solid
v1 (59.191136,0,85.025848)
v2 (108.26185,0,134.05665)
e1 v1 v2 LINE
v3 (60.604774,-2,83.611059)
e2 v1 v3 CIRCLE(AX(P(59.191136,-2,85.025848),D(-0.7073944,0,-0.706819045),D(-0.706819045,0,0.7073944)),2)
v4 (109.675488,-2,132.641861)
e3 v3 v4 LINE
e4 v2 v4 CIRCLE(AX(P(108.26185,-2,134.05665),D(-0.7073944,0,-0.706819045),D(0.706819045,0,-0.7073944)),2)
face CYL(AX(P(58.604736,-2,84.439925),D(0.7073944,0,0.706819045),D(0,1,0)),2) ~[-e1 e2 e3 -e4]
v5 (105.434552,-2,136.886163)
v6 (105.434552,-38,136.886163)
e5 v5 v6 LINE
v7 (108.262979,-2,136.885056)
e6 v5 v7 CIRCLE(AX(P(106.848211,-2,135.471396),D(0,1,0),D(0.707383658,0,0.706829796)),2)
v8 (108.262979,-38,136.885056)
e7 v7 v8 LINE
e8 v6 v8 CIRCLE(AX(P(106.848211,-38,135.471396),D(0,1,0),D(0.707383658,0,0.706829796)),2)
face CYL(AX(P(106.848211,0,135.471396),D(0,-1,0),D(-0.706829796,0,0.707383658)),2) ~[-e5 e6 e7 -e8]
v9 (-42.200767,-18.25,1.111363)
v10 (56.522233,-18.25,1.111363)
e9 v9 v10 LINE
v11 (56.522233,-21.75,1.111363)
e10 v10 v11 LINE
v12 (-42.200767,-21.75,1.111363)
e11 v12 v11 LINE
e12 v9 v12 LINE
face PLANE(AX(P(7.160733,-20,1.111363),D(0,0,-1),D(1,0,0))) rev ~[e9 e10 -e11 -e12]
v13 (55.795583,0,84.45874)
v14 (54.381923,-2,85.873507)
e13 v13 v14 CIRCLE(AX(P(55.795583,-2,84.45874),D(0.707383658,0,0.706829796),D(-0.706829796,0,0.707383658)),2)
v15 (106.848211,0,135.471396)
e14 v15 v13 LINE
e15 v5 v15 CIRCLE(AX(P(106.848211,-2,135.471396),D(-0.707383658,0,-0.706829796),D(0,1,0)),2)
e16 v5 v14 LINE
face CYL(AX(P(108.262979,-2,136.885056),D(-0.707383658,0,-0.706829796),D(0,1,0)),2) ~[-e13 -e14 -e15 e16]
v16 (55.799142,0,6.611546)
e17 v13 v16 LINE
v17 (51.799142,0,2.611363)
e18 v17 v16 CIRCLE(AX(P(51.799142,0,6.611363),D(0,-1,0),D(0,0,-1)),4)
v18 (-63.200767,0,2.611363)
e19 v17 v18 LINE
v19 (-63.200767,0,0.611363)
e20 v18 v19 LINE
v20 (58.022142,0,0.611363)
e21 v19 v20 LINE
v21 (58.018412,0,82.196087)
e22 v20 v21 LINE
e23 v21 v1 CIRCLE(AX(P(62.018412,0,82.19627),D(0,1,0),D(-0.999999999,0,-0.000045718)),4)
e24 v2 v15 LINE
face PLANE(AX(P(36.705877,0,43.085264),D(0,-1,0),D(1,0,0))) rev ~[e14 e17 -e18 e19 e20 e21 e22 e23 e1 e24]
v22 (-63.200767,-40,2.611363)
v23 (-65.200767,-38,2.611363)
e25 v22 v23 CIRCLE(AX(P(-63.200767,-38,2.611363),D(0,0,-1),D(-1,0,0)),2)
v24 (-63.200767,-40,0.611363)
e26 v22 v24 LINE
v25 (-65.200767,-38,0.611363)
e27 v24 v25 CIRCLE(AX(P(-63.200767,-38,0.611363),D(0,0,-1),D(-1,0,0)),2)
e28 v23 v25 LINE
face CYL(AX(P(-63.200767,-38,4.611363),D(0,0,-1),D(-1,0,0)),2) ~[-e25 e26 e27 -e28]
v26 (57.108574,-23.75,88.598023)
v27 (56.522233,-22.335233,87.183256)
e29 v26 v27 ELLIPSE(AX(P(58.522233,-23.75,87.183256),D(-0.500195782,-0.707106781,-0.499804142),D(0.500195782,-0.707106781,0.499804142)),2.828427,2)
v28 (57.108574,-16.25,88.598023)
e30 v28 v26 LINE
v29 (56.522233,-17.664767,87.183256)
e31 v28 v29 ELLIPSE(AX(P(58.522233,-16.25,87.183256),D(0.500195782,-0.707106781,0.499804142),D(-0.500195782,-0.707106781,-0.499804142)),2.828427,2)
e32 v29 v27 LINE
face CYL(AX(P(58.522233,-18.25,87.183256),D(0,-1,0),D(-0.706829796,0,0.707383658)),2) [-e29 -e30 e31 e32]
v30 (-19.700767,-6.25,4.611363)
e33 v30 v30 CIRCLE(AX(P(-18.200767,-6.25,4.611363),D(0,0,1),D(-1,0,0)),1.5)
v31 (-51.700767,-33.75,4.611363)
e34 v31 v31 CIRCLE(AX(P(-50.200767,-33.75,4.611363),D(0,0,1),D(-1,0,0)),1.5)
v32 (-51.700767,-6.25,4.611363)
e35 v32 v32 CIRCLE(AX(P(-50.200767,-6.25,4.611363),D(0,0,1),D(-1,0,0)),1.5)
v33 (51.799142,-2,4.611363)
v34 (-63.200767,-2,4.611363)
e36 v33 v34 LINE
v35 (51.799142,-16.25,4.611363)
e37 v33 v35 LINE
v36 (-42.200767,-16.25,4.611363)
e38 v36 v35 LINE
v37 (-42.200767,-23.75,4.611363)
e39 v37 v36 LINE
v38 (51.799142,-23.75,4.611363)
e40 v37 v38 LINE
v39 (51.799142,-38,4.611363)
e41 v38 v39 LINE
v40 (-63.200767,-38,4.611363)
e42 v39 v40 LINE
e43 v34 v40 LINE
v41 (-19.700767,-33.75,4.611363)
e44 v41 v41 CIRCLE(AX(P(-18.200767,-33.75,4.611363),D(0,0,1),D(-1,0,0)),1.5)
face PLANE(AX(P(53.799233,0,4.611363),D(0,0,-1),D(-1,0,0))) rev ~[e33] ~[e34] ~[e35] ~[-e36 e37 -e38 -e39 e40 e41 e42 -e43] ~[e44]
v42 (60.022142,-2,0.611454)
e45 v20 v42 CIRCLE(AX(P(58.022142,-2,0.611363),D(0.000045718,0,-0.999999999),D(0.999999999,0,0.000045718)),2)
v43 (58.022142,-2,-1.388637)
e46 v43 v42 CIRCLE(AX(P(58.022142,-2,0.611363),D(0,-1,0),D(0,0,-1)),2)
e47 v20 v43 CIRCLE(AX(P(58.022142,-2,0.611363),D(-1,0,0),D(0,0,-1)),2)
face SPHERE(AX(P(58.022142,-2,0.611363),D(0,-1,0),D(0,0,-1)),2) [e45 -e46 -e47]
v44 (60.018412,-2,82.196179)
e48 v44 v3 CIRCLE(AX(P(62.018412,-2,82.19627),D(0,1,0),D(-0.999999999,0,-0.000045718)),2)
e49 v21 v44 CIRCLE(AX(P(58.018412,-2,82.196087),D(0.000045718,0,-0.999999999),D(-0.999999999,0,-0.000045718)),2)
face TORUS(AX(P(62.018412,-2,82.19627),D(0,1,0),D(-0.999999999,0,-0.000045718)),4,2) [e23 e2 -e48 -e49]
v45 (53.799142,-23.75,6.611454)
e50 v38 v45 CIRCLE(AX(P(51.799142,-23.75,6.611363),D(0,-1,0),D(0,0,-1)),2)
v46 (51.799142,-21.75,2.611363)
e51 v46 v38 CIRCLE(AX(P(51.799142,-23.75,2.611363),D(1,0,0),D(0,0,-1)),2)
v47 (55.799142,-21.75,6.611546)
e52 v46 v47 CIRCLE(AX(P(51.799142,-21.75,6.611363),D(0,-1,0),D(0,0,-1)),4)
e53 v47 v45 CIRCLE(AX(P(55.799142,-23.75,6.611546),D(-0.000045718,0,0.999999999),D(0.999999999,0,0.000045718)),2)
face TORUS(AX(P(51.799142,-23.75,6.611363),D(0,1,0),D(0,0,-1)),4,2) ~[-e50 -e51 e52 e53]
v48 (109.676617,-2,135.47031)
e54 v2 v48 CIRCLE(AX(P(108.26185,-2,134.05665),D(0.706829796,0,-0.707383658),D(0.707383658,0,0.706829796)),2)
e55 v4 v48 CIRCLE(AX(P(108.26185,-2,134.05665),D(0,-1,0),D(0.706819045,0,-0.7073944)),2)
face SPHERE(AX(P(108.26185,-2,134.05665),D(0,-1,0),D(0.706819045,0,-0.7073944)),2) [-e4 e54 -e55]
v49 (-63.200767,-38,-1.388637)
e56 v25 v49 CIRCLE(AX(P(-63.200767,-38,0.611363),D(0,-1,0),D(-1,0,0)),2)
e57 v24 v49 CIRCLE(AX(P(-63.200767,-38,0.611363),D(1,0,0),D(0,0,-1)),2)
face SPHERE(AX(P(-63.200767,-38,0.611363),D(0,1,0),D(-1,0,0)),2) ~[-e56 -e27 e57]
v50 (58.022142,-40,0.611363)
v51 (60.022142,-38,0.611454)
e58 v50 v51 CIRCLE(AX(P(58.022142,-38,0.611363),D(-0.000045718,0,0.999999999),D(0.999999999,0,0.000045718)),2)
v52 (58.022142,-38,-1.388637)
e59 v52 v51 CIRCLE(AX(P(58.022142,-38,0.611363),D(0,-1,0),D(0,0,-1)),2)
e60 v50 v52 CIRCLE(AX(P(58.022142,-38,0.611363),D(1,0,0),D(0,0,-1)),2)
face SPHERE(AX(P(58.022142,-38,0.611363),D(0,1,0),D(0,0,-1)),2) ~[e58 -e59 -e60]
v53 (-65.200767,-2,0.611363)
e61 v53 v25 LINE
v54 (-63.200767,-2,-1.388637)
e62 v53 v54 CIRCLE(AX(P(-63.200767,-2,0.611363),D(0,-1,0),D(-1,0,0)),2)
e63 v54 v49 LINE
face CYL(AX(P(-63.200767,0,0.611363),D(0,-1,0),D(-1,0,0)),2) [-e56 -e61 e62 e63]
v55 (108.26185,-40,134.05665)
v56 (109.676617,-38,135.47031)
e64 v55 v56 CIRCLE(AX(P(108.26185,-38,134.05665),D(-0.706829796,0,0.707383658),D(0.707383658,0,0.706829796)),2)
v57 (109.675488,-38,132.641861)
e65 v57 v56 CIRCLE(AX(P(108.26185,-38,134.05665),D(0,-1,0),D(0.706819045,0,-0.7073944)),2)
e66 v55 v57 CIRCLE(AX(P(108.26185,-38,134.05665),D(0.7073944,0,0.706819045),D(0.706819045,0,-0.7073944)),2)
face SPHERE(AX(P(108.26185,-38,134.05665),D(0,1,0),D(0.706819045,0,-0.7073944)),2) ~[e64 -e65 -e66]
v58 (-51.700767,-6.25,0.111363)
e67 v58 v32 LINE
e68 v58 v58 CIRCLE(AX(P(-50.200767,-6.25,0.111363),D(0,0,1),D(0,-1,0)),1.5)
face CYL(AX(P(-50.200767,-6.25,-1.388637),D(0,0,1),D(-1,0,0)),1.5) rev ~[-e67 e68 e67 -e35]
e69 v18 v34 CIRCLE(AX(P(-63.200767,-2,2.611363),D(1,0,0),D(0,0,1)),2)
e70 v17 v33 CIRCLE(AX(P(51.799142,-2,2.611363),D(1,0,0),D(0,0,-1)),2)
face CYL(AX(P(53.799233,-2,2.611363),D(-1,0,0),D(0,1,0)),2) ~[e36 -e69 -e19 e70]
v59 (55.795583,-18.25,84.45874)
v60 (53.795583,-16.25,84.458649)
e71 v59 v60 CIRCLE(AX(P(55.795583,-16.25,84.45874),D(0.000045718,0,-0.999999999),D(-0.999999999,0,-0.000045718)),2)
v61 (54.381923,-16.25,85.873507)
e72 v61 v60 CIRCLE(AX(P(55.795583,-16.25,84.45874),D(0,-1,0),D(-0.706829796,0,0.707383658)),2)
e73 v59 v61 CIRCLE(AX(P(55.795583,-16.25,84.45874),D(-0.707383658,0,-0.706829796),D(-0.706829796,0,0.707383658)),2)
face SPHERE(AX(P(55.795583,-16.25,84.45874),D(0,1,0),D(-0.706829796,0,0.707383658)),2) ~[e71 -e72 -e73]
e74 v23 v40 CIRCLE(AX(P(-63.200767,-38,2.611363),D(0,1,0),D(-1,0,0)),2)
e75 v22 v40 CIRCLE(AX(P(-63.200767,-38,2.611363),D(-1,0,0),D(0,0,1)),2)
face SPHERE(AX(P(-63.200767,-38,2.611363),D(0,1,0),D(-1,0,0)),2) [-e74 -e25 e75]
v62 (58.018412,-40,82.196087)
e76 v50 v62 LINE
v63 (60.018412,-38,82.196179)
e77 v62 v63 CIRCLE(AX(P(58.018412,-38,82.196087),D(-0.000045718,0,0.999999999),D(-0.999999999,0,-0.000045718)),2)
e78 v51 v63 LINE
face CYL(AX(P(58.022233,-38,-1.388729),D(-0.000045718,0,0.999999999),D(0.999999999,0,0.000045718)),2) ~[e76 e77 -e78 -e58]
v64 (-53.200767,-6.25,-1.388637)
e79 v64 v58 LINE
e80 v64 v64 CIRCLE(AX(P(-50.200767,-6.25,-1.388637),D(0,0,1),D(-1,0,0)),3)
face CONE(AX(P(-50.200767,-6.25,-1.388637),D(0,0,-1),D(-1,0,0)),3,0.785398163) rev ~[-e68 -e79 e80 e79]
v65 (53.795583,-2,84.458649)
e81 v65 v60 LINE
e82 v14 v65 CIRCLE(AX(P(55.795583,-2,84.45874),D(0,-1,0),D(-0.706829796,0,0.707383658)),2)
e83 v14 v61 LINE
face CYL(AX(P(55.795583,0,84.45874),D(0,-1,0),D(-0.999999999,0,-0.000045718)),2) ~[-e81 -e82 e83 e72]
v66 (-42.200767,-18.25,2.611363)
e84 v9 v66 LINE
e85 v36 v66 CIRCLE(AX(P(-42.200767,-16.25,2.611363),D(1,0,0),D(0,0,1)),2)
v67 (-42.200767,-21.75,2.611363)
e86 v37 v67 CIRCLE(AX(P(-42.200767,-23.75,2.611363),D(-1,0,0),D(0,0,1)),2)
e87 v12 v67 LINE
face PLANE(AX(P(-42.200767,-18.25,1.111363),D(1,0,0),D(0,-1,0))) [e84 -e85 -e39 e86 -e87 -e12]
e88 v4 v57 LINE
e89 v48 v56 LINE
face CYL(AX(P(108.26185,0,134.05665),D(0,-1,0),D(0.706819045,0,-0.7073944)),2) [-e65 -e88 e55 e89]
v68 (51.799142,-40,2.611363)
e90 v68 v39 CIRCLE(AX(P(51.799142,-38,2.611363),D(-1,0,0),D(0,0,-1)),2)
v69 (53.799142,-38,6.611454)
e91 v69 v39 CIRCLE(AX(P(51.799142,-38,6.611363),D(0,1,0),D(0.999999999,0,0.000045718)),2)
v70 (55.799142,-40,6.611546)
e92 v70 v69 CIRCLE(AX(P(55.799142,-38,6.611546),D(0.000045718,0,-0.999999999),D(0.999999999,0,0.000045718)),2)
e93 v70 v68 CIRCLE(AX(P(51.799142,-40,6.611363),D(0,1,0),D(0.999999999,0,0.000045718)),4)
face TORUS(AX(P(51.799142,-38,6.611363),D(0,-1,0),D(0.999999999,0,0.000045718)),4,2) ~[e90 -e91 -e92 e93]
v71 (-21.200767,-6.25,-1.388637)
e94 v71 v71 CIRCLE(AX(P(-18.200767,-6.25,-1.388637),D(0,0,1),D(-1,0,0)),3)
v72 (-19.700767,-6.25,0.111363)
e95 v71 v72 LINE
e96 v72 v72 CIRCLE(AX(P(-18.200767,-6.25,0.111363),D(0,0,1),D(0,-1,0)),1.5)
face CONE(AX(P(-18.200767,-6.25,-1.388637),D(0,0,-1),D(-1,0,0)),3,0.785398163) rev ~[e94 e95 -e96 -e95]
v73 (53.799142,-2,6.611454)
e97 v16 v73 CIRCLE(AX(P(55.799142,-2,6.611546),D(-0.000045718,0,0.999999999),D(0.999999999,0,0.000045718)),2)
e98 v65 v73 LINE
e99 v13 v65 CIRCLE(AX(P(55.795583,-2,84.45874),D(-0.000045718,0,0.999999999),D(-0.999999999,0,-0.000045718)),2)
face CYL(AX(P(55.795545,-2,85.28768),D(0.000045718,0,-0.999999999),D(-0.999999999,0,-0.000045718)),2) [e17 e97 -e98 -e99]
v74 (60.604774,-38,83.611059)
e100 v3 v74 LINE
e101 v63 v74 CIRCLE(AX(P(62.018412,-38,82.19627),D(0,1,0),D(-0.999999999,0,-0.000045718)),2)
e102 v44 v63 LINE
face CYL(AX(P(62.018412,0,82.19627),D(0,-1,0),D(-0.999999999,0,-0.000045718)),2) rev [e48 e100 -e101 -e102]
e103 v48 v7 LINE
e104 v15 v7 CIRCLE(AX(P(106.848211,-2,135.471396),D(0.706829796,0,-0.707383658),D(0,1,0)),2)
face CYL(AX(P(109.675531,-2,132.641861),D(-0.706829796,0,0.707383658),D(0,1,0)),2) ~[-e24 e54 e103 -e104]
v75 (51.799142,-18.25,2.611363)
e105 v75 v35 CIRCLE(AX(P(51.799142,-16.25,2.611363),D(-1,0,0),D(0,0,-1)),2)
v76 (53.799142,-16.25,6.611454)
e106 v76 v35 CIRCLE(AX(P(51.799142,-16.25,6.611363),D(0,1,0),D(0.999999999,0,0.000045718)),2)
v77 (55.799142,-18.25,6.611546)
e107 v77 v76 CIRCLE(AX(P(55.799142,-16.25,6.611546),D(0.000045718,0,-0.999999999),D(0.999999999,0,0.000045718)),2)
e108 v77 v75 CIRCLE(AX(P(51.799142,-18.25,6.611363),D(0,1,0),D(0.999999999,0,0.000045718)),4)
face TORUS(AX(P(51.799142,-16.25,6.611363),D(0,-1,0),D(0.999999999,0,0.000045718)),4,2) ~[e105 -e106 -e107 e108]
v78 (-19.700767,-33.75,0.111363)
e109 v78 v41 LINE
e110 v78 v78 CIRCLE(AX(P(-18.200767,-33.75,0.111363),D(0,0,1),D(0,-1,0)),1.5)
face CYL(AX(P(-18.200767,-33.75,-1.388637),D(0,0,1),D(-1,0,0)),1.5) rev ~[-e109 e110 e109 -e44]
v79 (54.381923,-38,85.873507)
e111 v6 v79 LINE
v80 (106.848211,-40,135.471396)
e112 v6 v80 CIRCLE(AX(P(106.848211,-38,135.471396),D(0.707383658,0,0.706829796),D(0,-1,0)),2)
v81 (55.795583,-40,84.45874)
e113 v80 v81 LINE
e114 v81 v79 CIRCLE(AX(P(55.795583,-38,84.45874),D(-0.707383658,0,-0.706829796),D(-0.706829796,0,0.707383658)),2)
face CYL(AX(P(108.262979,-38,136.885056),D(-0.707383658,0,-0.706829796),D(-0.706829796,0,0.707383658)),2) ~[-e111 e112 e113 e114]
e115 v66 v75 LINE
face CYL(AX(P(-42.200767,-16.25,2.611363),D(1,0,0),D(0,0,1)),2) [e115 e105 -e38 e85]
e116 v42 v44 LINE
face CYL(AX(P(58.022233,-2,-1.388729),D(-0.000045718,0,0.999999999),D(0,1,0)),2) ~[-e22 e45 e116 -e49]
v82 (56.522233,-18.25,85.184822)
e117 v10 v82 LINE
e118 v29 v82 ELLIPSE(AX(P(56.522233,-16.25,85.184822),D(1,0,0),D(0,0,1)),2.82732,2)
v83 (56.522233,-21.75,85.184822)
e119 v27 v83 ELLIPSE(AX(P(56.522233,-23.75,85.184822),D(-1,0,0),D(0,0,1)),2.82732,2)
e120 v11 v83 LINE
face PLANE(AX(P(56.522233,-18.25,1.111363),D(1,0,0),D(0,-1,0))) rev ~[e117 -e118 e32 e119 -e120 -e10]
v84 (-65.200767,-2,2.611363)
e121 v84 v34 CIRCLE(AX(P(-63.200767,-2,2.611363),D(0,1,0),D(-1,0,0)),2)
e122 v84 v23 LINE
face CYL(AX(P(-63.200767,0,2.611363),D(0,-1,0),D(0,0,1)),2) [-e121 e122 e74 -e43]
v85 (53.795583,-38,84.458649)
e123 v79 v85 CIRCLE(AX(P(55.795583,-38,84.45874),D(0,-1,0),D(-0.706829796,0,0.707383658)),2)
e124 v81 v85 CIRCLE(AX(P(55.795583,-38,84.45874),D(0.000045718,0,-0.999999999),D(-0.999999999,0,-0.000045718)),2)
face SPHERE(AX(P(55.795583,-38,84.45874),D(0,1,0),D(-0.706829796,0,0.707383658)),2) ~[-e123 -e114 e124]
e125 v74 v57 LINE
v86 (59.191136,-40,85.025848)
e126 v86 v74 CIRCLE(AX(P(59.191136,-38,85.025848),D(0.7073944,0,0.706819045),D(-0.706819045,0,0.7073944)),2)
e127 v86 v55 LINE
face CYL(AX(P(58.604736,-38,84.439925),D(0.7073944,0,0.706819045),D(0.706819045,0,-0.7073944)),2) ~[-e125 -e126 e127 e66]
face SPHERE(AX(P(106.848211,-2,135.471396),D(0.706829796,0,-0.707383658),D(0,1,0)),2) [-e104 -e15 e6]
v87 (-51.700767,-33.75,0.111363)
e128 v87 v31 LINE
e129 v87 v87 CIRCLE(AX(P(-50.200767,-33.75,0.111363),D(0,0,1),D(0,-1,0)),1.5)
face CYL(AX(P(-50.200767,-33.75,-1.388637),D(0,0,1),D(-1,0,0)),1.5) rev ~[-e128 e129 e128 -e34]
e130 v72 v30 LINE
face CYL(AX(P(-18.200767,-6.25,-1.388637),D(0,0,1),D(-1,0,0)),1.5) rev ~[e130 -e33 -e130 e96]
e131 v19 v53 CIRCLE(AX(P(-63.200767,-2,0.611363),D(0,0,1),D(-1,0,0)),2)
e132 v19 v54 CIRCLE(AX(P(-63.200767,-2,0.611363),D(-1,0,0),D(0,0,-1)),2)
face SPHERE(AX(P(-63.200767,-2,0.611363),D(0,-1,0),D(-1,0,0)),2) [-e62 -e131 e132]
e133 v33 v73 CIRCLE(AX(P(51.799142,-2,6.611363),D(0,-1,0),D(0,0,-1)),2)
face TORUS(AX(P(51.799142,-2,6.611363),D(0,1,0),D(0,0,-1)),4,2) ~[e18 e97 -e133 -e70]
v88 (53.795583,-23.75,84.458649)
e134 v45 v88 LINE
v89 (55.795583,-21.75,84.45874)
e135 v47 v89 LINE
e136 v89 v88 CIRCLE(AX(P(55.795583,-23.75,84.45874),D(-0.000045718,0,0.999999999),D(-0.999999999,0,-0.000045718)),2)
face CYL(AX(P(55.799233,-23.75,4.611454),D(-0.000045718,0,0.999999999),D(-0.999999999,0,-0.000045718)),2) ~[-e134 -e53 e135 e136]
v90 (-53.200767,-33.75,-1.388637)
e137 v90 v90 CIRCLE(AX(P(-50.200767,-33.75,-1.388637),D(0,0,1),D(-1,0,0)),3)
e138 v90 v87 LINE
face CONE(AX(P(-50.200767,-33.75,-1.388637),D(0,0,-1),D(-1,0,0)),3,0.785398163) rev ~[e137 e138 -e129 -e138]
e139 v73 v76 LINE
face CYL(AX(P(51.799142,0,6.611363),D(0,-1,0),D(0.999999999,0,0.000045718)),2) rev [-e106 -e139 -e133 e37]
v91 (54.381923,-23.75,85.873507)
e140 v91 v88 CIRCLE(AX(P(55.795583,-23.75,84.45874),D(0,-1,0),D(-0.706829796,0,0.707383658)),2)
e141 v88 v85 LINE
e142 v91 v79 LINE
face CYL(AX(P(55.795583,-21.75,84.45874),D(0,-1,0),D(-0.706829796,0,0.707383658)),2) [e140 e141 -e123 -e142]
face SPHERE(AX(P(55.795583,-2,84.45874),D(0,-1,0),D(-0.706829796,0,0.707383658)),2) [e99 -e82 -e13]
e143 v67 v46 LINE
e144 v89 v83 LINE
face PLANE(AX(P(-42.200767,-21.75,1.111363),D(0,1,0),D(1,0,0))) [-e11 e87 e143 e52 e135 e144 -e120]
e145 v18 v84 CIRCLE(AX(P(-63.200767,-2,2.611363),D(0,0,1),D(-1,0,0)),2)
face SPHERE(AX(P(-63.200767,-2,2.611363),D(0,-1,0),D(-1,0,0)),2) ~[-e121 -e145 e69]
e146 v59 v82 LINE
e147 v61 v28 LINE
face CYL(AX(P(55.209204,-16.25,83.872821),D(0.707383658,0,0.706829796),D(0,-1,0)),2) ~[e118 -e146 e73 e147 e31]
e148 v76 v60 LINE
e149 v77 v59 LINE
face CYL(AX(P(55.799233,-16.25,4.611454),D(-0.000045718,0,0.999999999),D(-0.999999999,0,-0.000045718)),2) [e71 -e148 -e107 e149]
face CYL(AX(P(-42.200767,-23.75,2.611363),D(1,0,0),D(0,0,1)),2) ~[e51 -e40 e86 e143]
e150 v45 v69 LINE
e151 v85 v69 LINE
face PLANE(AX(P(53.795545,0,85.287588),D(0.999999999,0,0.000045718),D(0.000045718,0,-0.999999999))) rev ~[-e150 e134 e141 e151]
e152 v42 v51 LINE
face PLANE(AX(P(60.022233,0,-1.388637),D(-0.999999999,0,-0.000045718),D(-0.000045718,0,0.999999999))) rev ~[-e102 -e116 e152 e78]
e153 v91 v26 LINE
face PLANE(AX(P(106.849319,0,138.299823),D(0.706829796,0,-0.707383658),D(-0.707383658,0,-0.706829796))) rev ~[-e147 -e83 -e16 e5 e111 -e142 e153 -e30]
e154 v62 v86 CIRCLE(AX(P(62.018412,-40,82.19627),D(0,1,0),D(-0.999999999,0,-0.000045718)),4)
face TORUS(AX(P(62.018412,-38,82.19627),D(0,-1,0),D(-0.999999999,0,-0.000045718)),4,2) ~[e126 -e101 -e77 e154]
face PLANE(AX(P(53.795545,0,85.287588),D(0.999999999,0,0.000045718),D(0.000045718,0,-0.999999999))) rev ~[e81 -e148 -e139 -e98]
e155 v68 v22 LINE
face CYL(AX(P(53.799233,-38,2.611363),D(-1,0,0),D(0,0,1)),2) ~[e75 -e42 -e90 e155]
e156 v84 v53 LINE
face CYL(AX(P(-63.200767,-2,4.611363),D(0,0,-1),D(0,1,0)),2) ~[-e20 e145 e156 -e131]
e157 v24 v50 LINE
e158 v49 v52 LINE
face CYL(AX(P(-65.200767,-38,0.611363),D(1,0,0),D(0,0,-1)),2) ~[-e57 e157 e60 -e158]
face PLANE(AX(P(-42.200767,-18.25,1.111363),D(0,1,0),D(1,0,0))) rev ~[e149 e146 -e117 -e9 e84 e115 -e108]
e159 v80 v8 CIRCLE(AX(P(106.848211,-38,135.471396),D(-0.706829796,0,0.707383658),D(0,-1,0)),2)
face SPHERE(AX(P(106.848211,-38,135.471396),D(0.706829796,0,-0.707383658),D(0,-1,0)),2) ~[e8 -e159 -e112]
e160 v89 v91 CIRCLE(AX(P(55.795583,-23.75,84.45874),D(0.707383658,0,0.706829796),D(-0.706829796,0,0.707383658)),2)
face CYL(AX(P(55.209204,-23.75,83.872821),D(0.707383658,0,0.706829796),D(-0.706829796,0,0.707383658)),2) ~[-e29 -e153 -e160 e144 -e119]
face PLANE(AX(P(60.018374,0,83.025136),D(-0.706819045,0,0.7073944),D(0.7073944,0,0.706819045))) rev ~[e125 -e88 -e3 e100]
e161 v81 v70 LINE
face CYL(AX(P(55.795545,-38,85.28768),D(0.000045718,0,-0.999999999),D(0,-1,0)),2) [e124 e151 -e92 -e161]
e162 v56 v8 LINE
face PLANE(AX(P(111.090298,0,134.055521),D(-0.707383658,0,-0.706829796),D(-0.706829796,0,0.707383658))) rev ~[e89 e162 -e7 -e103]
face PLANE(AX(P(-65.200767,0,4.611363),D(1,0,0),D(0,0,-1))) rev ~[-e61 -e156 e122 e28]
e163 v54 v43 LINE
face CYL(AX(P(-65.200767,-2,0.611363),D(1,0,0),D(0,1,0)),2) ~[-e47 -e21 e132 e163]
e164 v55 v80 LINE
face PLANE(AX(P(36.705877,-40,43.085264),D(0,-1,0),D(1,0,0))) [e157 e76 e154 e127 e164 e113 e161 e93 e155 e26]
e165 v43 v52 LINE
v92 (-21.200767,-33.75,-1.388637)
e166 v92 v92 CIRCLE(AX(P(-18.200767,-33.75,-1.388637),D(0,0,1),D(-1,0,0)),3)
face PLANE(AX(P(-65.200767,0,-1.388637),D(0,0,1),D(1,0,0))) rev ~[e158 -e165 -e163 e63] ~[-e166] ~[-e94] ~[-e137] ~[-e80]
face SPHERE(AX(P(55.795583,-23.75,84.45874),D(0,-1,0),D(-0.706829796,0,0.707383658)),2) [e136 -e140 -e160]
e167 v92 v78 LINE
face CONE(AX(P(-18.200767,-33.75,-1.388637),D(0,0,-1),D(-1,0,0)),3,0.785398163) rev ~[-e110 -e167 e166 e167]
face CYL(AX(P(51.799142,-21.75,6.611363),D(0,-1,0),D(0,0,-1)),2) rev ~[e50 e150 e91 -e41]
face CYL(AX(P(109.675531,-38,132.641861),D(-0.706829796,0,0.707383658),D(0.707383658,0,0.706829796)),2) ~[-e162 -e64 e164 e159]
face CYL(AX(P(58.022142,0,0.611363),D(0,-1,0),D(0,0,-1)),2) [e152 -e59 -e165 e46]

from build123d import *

# Parameters (mm, degrees)
F1_DEPTH       = 40
F3_D           = 3
F3_DEPTH       = 40
F3_CSINK_D     = 6
F3_CSINK_ANGLE = 90
F3_TIP         = 0.9012909285
F4_START       = -2.5
F2_W           = 98.723
F2_H           = 3.5
F4_DEPTH       = 98.5
F5_R           = 2


with BuildPart() as f1:
    # F0 (on Front) → F1 (new body)
    with BuildSketch(Plane.XZ):
        Polygon((53.7955448006, 85.2875881677), (53.7992331499, 4.6113628414), (-65.2007668501, 4.6113628414), (-65.2007668501, -1.3886371586), (60.0222331499, -1.3886371586), (60.0183739277, 83.0251359205), (111.0902979443, 134.055520892), (106.8493191704, 138.2998228416), align=None)
    extrude(amount=F1_DEPTH)

    # F3
    with Locations(Plane(origin=(0, 0, -1.3886371586), x_dir=(1, 0, 0), z_dir=(0, 0, -1))):
        with Locations((-50.2007668501, 33.75), (-50.2007668501, 6.25), (-18.2007668501, 6.25), (-18.2007668501, 33.75)):
            CounterSinkHole(F3_D / 2, F3_CSINK_D / 2, depth=F3_DEPTH, counter_sink_angle=F3_CSINK_ANGLE)
            with Locations((0, 0, -(F3_DEPTH + F3_TIP / 2))):  # 118° drill point
                Cone(0, F3_D / 2, F3_TIP, mode=Mode.SUBTRACT)

    # F2 (on face) → F4 (cut)
    with BuildSketch(Plane(origin=(0, 0, -1.3886371586), x_dir=(1, 0, 0), z_dir=(0, 0, -1)).offset(F4_START)):
        with Locations((7.1607331499, 20)):
            Rectangle(F2_W, F2_H)
    extrude(amount=-F4_DEPTH, mode=Mode.SUBTRACT)

    # F5
    f5_edges = [f1.edges().sort_by_distance(p)[0] for p in [
        (53.797389, -21.75, 44.949476),
        (53.799233, -30.875, 4.611363),
        (53.797389, -40, 44.949476),
        (53.795545, -30.875, 85.287588),
        (53.797389, 0, 44.949476),
        (53.799233, -9.125, 4.611363),
        (53.797389, -18.25, 44.949476),
        (53.795545, -9.125, 85.287588),
        (-65.200767, -20, 4.611363),
        (-65.200767, -20, -1.388637),
        (-65.200767, 0, 1.611363),
        (-65.200767, -40, 1.611363),
        (-5.700767, 0, 4.611363),
        (-2.589267, 0, -1.388637),
        (60.020304, 0, 40.818249),
        (85.554336, 0, 108.540328),
        (108.969809, 0, 136.177672),
        (80.322432, 0, 111.793706),
        (-5.700767, -40, 4.611363),
        (-2.589267, -40, -1.388637),
        (60.020304, -40, 40.818249),
        (85.554336, -40, 108.540328),
        (108.969809, -40, 136.177672),
        (80.322432, -40, 111.793706),
        (55.158889, -18.25, 86.649865),
        (56.522233, -20, 88.012142),
        (55.158889, -21.75, 86.649865),
        (106.849319, -20, 138.299823),
        (111.090298, -20, 134.055521),
        (60.022233, -20, -1.388637),
        (60.018374, -20, 83.025136),
        (5.799233, -21.75, 4.611363),
        (5.799233, -18.25, 4.611363),
    ]]
    fillet(f5_edges, radius=F5_R)


solid = f1.part
